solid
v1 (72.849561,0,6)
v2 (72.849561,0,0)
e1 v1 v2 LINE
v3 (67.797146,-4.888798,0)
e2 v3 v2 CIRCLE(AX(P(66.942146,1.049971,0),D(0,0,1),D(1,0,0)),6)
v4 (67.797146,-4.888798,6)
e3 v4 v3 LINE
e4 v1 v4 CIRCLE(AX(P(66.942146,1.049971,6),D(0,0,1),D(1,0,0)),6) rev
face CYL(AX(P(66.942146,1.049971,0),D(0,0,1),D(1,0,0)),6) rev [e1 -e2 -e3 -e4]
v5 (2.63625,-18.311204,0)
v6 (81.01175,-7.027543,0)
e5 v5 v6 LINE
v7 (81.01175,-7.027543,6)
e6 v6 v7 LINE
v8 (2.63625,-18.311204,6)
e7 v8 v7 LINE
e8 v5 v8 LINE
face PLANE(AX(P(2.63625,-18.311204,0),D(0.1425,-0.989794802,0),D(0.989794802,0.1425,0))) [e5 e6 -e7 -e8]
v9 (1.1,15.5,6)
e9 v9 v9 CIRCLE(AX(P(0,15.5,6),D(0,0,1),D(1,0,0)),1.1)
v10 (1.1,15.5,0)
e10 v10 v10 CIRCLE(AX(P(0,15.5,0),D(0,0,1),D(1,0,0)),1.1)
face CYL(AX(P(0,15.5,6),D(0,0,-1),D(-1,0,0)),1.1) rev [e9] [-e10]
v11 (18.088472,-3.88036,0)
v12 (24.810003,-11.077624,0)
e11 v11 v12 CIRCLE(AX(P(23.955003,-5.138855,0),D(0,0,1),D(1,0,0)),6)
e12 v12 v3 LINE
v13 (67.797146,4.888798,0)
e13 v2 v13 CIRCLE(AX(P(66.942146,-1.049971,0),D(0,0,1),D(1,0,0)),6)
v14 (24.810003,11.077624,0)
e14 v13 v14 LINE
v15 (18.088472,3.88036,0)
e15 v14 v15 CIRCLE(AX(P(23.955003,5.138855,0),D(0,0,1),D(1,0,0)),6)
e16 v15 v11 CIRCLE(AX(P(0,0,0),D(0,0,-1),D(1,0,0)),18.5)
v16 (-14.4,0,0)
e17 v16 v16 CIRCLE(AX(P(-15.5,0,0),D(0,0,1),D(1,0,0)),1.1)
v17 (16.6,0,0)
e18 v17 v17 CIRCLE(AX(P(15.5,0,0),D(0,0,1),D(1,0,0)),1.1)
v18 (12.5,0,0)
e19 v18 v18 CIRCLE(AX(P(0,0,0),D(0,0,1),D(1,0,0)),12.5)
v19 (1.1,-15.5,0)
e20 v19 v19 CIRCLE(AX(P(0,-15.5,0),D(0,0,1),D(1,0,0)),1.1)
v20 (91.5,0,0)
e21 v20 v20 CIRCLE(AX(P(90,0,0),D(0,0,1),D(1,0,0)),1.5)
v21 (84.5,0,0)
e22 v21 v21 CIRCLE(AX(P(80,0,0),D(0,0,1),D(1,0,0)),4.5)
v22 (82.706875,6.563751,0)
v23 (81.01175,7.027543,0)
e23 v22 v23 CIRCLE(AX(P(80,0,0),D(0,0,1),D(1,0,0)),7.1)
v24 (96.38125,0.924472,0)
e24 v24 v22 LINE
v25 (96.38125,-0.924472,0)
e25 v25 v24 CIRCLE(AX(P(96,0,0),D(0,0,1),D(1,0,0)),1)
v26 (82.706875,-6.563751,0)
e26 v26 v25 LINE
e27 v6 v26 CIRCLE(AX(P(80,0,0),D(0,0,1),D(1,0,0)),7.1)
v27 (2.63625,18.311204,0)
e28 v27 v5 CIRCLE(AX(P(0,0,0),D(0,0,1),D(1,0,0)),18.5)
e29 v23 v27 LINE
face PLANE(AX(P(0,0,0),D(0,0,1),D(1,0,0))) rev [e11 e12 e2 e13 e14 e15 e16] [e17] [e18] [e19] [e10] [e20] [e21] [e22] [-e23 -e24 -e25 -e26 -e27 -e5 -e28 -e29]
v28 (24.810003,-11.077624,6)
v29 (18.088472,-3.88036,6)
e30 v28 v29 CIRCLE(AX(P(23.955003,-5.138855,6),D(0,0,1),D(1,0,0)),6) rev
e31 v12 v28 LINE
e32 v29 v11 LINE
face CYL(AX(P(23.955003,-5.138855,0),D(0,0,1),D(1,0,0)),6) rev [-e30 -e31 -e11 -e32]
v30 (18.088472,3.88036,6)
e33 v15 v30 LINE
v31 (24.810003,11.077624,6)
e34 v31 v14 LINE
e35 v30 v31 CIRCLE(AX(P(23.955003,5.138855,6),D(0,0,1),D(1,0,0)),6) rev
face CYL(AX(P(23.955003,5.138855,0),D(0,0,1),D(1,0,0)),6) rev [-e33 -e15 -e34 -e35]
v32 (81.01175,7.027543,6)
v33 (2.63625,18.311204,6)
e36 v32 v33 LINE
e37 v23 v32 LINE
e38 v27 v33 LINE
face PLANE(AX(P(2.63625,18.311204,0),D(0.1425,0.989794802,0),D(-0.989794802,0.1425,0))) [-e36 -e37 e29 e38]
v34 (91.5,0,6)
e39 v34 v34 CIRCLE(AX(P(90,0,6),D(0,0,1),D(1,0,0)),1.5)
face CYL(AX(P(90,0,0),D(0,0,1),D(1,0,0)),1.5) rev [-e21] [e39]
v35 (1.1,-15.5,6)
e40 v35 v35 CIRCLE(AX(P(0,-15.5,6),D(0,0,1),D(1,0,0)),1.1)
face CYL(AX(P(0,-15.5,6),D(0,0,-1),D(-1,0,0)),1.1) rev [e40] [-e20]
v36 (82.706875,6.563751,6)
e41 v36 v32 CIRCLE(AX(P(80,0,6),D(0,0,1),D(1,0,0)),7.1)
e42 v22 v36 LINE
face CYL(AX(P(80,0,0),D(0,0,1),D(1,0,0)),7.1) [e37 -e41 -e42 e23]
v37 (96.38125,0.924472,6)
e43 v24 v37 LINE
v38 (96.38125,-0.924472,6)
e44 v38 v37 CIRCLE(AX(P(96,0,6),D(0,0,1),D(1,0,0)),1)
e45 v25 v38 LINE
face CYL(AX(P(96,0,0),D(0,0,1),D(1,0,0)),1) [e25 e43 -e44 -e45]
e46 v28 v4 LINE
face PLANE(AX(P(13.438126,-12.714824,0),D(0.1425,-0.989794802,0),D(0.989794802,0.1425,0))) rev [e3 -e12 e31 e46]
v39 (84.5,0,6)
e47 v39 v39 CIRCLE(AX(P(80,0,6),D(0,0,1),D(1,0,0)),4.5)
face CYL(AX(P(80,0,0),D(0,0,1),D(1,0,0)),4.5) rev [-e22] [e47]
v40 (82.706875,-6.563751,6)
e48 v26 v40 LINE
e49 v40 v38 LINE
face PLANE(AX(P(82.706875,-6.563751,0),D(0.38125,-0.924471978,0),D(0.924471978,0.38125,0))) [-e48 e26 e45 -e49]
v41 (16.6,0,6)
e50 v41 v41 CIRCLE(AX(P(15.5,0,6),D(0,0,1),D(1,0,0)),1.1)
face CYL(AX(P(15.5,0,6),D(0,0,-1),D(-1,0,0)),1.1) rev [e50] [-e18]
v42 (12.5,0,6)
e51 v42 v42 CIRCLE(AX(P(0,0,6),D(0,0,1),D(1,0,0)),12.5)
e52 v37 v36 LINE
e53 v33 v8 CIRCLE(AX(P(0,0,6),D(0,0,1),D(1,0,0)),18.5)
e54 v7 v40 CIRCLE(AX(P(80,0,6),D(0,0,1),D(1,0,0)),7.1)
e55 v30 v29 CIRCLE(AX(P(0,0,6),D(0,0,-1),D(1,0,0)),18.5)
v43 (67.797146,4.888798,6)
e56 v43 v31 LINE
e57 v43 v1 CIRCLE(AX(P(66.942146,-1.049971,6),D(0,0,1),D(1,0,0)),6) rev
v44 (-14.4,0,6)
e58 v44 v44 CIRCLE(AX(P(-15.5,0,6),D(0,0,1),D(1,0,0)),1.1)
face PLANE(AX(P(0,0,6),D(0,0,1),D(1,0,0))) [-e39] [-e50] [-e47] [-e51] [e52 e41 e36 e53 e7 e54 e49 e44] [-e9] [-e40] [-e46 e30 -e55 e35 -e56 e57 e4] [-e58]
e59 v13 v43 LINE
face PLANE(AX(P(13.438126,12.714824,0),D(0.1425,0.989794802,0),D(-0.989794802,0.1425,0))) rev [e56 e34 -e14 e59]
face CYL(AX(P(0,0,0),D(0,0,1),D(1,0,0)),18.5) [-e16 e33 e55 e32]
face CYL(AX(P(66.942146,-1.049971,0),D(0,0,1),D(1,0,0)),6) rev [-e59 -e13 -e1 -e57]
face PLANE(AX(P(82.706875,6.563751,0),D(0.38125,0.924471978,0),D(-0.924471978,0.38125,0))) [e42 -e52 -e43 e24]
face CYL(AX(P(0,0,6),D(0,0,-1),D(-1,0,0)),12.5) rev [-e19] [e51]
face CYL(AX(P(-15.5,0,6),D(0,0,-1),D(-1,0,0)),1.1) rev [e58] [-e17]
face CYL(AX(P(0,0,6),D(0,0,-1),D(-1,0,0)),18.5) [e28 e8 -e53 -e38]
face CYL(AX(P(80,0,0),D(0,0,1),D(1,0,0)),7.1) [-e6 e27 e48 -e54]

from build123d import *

# Parameters (mm, degrees)
ESQUISSE1_R             = 18.5
ESQUISSE1_R_2           = 1.1
ESQUISSE1_R_3           = 12.5
BOSS_EXTRU_1_DEPTH      = 6
BOSS_EXTRU_2_START      = -6
ESQUISSE2_R             = 4.5
BOSS_EXTRU_2_DEPTH      = 6
ENL_V_MAT_EXTRU_1_DEPTH = 90.244943834
CONG_1_R                = 6
BOSS_EXTRU_3_START      = -6
ESQUISSE4_R             = 1.5
BOSS_EXTRU_3_DEPTH      = 6


with BuildPart() as part:
    # Esquisse1 → Boss.-Extru.1 (new body)
    with BuildSketch(Plane.XY):
        Circle(ESQUISSE1_R)
        with Locations((0, 15.5)):
            Circle(ESQUISSE1_R_2, mode=Mode.SUBTRACT)
        with Locations((15.5, 0)):
            Circle(ESQUISSE1_R_2, mode=Mode.SUBTRACT)
        with Locations((0, -15.5)):
            Circle(ESQUISSE1_R_2, mode=Mode.SUBTRACT)
        with Locations((-15.5, 0)):
            Circle(ESQUISSE1_R_2, mode=Mode.SUBTRACT)
        Circle(ESQUISSE1_R_3, mode=Mode.SUBTRACT)
    extrude(amount=BOSS_EXTRU_1_DEPTH)

    # Esquisse2 → Boss.-Extru.2 (add)
    with BuildSketch(Plane.XY.offset(6).offset(BOSS_EXTRU_2_START)):
        with BuildLine():
            Line((2.63625, 18.311203836), (81.01175, 7.027543094))
            ThreePointArc((81.01175, 7.027543094), (87.1, 0), (81.01175, -7.027543094))
            Line((81.01175, -7.027543094), (2.63625, -18.311203836))
            ThreePointArc((2.63625, -18.311203836), (18.5, 0), (2.63625, 18.311203836))
        make_face()
        with Locations((80, 0)):
            Circle(ESQUISSE2_R, mode=Mode.SUBTRACT)
    extrude(amount=BOSS_EXTRU_2_DEPTH)

    # Esquisse3 → Enlèv. mat.-Extru.1 (cut, through all)
    with BuildSketch(Plane.XY.offset(6)):
        with BuildLine():
            Line((13.438126494, 12.714824274), (74.119447809, 3.978580893))
            ThreePointArc((74.119447809, 3.978580893), (72.9, 0), (74.119447809, -3.978580893))
            Line((74.119447809, -3.978580893), (13.438126494, -12.714824274))
            ThreePointArc((13.438126494, -12.714824274), (18.5, 0), (13.438126494, 12.714824274))
        make_face()
    extrude(amount=-ENL_V_MAT_EXTRU_1_DEPTH, mode=Mode.SUBTRACT)

    # Congé1
    # the kernel refuses this fillet: 6 mm, written as the material it adds along each edge
    with BuildSketch(Plane(origin=(74.119447809, -3.978580893, 6), x_dir=(-0.989794801966549, -0.1424999999999999, 0), z_dir=(0, 0, -1))) as cong_1_piece_1:
        with BuildLine():
            CenterArc((6.387487769, 6), CONG_1_R, 192.789750134, 77.210249866)
            ThreePointArc((0.536353935, 4.671755725), (0.666177836, 2.290184264), (0, 0))
            Line((0, 0), (6.387487769, 0))
        make_face()
    extrude(amount=6)
    with BuildSketch(Plane(origin=(74.119447809, 3.978580893, 6), x_dir=(-0.25446461339287313, -0.9670820857253097, 0), z_dir=(0, 0, -1))) as cong_1_piece_2:
        with BuildLine():
            CenterArc((6.689391795, 5.661451882), CONG_1_R, 173.450673101, 77.210249866)
            Line((0.728547621, 6.345803209), (0, 0))
            ThreePointArc((0, 0), (2.351221868, 0.400615273), (4.702443737, 0))
        make_face()
    extrude(amount=6)
    with BuildSketch(Plane(origin=(13.438126494, -12.714824274, 6), x_dir=(0.46579561947351233, 0.8848923329305587, 0), z_dir=(0, 0, -1))) as cong_1_piece_3:
        with BuildLine():
            CenterArc((11.602632031, 5.777450125), CONG_1_R, 144.04573826, 110.300190842)
            Line((6.745716297, 9.300285568), (0, 0))
            ThreePointArc((0, 0), (4.99183006, 0.686195447), (9.98366012, 0))
        make_face()
    extrude(amount=6)
    with BuildSketch(Plane(origin=(13.438126494, 12.714824274, 6), x_dir=(0.4657956194735124, -0.8848923329305588, 0), z_dir=(0, 0, -1))) as cong_1_piece_4:
        with BuildLine():
            CenterArc((11.602632031, -5.777450125), CONG_1_R, 105.654070898, 110.300190842)
            Line((6.745716297, -9.300285568), (0, 0))
            ThreePointArc((0, 0), (4.99183006, -0.686195447), (9.98366012, 0))
        make_face()
    extrude(amount=6)

    # Esquisse4 → Boss.-Extru.3 (add)
    with BuildSketch(Plane.XY.offset(6).offset(BOSS_EXTRU_3_START)):
        with BuildLine():
            Line((82.706875, 6.563751041), (96.38125, 0.924471978))
            ThreePointArc((96.38125, 0.924471978), (97, 0), (96.38125, -0.924471978))
            Line((96.38125, -0.924471978), (82.706875, -6.563751041))
            ThreePointArc((82.706875, -6.563751041), (87.1, 0), (82.706875, 6.563751041))
        make_face()
        with Locations((90, 0)):
            Circle(ESQUISSE4_R, mode=Mode.SUBTRACT)
    extrude(amount=BOSS_EXTRU_3_DEPTH)


solid = part.part
